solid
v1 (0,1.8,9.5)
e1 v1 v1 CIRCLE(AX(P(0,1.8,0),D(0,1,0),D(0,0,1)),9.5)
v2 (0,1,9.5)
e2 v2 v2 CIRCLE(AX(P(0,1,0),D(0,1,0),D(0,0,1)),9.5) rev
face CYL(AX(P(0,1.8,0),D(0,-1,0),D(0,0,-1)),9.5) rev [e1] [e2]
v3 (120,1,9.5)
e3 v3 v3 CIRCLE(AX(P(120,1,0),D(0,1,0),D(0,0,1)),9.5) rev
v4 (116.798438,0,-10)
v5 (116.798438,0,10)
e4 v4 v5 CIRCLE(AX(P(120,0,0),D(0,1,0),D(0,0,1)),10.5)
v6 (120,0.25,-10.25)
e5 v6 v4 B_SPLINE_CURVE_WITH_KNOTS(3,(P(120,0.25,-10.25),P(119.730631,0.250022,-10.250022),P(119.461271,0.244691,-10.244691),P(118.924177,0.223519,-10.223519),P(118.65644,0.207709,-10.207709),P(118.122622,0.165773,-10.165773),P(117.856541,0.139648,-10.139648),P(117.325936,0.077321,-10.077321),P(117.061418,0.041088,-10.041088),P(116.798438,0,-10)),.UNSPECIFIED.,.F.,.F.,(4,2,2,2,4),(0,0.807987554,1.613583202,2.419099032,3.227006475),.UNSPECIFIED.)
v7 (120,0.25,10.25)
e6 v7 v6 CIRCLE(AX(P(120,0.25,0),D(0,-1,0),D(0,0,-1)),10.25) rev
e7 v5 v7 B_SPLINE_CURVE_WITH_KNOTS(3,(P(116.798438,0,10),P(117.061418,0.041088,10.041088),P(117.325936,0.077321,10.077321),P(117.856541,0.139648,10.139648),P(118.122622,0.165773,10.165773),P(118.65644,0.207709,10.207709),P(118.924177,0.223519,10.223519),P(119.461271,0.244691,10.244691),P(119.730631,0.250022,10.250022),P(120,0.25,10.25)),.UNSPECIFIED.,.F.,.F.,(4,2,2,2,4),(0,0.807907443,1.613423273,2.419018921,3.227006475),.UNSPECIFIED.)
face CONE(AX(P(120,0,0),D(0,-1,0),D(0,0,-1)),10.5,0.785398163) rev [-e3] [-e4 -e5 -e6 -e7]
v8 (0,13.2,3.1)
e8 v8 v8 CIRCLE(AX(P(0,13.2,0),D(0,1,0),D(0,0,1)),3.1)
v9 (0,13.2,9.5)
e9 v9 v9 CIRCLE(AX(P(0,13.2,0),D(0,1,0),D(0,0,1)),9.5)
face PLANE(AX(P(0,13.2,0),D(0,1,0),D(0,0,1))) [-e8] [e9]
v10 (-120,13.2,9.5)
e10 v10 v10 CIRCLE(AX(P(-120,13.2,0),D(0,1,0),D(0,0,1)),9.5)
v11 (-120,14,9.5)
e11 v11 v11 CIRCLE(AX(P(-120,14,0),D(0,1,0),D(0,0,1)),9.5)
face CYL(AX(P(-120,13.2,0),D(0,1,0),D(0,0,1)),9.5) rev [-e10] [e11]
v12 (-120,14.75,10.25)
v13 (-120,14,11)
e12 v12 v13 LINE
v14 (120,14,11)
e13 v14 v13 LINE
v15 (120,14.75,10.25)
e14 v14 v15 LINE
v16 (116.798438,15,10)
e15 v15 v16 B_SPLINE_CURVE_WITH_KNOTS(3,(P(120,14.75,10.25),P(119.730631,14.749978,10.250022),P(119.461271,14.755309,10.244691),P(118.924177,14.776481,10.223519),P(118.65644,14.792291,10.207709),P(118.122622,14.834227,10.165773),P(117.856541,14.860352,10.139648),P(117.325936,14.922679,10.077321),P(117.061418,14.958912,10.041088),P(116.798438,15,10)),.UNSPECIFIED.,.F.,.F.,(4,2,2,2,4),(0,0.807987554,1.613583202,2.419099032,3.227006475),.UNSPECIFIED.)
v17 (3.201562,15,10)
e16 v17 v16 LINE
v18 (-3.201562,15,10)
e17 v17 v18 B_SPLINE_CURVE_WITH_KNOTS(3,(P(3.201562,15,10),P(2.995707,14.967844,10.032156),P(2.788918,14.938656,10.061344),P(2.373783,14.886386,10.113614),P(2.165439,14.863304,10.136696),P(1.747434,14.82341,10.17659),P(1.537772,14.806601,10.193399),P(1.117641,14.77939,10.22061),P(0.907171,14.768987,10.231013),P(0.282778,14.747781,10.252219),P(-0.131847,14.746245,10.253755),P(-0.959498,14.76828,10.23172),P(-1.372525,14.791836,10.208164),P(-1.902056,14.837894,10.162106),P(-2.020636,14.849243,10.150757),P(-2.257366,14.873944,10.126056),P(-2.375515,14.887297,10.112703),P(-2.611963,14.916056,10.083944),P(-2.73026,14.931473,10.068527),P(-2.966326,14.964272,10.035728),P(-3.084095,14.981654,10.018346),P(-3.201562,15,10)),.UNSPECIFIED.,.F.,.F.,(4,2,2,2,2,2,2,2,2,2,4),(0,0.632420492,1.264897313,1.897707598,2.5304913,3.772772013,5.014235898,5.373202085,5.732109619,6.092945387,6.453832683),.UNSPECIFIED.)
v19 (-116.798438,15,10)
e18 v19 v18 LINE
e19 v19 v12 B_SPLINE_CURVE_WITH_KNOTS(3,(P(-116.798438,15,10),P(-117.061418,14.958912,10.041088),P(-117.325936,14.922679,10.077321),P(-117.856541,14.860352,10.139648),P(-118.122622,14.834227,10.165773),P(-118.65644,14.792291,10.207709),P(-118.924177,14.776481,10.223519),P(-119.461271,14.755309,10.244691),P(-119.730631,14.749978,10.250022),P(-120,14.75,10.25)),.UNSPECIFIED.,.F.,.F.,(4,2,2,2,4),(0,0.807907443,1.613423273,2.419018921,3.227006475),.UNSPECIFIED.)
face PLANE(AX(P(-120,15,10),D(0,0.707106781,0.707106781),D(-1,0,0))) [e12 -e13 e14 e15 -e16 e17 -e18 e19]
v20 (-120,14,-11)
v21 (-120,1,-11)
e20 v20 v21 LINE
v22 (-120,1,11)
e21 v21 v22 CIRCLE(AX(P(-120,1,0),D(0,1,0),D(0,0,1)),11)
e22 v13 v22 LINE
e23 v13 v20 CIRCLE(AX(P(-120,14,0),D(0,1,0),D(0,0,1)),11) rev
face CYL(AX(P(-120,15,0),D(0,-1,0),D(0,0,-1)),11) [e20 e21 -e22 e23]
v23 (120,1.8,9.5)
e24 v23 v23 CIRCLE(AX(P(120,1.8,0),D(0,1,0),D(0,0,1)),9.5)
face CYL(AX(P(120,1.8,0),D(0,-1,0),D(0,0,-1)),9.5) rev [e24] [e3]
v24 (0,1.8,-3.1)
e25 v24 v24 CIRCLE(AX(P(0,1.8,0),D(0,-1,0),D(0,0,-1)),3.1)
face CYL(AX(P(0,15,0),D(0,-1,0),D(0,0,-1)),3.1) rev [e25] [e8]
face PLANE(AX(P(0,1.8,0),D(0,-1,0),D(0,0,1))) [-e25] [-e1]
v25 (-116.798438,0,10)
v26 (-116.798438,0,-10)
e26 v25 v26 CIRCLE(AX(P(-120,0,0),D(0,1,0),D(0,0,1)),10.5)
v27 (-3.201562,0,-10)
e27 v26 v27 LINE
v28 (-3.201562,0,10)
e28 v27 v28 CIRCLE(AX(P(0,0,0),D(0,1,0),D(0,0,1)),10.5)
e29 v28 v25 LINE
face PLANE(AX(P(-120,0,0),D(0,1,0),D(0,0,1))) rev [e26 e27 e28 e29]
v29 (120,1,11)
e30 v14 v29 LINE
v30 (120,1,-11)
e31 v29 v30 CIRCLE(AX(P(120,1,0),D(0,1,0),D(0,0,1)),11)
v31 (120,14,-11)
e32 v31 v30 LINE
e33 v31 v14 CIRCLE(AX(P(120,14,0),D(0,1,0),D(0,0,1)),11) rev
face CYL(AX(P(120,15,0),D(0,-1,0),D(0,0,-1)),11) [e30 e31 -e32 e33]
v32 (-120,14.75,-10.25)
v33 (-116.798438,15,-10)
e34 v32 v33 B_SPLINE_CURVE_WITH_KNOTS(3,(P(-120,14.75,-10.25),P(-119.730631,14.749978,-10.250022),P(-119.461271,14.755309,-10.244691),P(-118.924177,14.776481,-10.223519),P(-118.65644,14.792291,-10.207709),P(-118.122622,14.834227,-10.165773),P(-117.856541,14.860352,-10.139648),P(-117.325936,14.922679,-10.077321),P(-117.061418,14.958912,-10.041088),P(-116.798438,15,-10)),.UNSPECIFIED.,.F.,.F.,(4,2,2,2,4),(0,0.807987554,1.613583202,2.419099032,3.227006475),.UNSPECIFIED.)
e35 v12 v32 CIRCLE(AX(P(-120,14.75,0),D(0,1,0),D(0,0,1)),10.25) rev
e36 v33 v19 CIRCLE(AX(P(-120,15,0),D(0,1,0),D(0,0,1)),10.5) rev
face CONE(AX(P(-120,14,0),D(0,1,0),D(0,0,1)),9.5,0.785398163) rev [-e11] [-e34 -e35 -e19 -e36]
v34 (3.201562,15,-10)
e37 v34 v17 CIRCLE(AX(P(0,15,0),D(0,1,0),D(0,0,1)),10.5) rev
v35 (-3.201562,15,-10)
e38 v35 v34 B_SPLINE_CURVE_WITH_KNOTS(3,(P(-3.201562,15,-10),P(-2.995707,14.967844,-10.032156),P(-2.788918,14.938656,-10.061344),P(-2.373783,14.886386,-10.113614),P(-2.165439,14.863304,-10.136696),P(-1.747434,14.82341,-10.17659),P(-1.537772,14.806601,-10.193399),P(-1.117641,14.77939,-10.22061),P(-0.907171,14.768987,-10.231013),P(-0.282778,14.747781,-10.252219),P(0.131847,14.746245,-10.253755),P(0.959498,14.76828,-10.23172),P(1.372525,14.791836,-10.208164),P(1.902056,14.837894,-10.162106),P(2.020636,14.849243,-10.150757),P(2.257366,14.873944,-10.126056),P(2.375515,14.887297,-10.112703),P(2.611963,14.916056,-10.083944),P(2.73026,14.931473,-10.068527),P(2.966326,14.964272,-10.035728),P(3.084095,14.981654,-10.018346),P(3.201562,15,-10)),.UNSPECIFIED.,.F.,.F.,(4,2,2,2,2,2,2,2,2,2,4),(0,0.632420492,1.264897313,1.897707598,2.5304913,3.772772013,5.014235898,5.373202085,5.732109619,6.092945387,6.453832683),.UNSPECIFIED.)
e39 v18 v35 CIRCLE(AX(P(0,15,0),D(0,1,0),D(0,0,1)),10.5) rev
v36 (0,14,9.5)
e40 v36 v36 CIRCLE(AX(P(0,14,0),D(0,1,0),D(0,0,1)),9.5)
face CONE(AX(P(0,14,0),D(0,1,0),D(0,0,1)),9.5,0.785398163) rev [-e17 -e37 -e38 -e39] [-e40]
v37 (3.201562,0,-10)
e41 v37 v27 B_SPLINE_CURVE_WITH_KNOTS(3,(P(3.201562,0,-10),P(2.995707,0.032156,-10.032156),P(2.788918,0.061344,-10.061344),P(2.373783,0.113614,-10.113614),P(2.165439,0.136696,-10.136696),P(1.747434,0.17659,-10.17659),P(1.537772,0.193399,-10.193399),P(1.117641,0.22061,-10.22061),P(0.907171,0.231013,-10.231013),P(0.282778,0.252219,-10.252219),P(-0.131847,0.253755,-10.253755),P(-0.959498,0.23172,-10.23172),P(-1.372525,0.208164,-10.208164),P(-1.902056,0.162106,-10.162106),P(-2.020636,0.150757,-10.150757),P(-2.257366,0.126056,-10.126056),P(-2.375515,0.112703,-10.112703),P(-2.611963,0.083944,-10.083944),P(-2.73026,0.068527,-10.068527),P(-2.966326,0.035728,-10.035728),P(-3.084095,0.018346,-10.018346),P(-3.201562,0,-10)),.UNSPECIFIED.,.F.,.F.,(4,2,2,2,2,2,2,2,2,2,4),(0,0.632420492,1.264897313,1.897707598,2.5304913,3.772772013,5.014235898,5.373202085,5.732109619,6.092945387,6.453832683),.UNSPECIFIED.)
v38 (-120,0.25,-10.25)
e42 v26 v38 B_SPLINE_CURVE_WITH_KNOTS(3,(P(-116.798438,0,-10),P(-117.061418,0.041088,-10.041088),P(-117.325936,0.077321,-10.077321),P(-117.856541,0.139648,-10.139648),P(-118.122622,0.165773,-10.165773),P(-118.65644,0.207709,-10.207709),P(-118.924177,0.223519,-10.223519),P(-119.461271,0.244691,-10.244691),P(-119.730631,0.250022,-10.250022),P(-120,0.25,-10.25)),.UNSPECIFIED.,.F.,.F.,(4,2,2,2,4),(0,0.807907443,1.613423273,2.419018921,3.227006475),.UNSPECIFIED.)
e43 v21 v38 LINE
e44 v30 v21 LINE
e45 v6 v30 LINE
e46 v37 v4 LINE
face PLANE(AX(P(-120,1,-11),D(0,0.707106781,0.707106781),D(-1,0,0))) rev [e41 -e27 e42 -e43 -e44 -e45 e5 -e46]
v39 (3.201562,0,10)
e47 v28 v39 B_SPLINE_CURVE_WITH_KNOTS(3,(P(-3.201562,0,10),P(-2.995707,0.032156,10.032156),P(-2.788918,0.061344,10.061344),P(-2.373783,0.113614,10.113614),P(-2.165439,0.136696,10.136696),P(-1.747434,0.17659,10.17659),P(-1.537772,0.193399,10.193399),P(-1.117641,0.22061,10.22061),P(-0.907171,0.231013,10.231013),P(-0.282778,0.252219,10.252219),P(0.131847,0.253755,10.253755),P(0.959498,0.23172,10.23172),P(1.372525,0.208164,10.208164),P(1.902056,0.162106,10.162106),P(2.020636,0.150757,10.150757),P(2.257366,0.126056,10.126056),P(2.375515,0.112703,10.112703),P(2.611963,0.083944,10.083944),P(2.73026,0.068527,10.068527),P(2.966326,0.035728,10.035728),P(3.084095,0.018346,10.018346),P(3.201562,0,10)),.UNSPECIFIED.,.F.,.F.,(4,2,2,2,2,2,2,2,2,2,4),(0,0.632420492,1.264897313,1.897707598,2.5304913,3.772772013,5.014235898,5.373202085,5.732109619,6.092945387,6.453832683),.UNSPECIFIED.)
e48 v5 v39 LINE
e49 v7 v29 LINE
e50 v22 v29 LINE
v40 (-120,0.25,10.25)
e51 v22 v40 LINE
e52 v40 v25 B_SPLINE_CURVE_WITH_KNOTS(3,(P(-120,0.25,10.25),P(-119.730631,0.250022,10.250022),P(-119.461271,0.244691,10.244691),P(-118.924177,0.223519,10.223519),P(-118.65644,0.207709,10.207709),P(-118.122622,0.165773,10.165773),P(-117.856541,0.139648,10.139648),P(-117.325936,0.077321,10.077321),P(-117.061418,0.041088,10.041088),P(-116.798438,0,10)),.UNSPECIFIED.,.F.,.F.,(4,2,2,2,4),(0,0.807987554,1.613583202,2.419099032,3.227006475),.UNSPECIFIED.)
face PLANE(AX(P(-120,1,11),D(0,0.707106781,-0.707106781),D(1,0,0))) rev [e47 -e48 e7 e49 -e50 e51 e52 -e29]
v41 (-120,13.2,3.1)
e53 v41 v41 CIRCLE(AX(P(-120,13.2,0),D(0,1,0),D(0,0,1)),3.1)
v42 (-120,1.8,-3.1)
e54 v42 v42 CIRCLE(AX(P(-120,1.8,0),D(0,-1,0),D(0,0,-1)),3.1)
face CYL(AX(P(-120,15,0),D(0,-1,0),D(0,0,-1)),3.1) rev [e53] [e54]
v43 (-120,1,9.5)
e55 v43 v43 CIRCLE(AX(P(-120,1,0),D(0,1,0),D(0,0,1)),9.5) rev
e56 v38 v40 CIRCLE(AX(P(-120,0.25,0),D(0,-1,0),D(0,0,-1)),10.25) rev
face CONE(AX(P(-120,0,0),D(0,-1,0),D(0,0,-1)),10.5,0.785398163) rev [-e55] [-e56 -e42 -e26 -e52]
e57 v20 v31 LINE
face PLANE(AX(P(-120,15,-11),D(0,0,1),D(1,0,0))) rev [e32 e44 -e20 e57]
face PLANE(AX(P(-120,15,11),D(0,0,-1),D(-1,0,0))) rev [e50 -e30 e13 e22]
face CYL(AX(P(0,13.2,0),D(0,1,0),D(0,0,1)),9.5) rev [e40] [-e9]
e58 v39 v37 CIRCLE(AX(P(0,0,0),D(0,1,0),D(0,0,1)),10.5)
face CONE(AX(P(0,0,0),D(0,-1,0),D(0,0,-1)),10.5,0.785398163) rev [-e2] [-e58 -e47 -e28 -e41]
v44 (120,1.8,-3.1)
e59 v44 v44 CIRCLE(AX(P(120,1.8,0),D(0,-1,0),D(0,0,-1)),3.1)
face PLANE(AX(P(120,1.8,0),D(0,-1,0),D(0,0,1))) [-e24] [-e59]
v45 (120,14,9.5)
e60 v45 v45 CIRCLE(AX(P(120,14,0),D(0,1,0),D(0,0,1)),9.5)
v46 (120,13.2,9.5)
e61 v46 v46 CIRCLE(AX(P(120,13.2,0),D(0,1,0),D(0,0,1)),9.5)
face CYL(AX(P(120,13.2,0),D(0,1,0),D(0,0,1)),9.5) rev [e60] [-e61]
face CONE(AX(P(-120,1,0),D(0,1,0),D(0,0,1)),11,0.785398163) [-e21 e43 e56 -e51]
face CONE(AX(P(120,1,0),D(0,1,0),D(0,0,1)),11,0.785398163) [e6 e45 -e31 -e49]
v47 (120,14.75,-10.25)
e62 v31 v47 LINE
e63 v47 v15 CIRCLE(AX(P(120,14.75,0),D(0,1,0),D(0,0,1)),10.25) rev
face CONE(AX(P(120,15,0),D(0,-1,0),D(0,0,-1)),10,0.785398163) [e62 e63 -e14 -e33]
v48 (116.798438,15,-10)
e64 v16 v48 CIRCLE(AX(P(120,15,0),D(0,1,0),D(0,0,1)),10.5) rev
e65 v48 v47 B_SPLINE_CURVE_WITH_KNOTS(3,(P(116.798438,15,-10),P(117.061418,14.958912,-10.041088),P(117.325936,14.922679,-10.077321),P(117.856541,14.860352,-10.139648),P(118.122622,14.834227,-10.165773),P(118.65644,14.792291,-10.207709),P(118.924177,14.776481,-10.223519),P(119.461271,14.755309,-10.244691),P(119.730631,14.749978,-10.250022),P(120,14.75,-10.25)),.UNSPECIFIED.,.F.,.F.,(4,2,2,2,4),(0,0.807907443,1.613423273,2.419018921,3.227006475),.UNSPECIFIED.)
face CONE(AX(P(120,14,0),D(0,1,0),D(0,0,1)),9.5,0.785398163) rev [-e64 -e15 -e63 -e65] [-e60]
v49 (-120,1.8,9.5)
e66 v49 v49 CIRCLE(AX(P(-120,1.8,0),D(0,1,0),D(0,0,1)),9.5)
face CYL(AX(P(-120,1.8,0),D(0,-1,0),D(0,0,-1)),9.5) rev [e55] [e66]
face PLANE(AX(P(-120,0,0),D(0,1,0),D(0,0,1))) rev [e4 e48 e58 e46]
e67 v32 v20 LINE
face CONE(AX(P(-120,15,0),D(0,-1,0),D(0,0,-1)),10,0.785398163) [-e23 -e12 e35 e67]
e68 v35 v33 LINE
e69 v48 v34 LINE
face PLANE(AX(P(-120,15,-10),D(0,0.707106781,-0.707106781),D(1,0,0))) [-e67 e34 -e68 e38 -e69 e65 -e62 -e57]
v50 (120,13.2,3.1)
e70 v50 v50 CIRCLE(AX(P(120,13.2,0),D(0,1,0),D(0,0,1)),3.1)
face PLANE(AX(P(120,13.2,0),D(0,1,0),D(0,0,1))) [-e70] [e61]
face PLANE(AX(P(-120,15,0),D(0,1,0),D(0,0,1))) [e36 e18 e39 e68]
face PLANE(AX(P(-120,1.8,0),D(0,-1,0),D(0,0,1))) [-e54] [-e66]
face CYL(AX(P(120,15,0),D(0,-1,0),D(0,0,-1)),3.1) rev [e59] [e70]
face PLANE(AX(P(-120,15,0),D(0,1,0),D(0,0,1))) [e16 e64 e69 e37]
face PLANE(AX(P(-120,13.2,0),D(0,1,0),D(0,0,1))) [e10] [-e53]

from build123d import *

# Parameters (mm, degrees)
SKETCH1_R           = 3.1
BOSS_EXTRUDE1_DEPTH = 15
SKETCH2_R           = 9.5
CUT_EXTRUDE1_DEPTH  = 1.8
CHAMFER2_SIZE       = 1


with BuildPart() as part:
    # Sketch1 → Boss-Extrude1 (new body)
    with BuildSketch(Plane(origin=(0, 0, 0), x_dir=(1, 0, 0), z_dir=(0, 1, 0))):
        with BuildLine():
            Line((-120, 11), (120, 11))
            ThreePointArc((120, 11), (131, 0), (120, -11))
            Line((120, -11), (-120, -11))
            ThreePointArc((-120, -11), (-131, 0), (-120, 11))
        make_face()
        with Locations(Location((-120, 0, 0), (0, 0, 270))):
            Circle(SKETCH1_R, mode=Mode.SUBTRACT)
        with Locations(Location((120, 0, 0), (0, 0, 270))):
            Circle(SKETCH1_R, mode=Mode.SUBTRACT)
        with Locations(Location((0, 0, 0), (0, 0, 270))):
            Circle(SKETCH1_R, mode=Mode.SUBTRACT)
    extrude(amount=BOSS_EXTRUDE1_DEPTH)

    # Sketch2 → Cut-Extrude1 (cut)
    with BuildSketch(Plane(origin=(0, 15, 0), x_dir=(1, 0, 0), z_dir=(0, 1, 0))):
        with Locations(Location((120, 0, 0), (0, 0, 270))):
            Circle(SKETCH2_R)
        with Locations(Location((0, 0, 0), (0, 0, 270))):
            Circle(SKETCH2_R)
        with Locations(Location((-120, 0, 0), (0, 0, 270))):
            Circle(SKETCH2_R)
    cut_extrude1 = extrude(amount=-CUT_EXTRUDE1_DEPTH, mode=Mode.SUBTRACT)

    # Chamfer2
    chamfer2_edges = [part.edges().sort_by_distance(p)[0] for p in [
        (131, 15, 0),
        (0, 15, -11),
        (-131, 15, 0),
        (0, 0, -11),
        (131, 0, 0),
        (0, 0, 11),
        (-131, 0, 0),
        (0, 15, 11),
    ]]
    chamfer(chamfer2_edges, length=CHAMFER2_SIZE)

    # Mirror1: Cut-Extrude1 across plane
    add(cut_extrude1.mirror(Plane.ZX.offset(7.5)), mode=Mode.SUBTRACT)

    # Chamfer1: read off the stored shape, not the designer's step
    # Chamfer1: loft between two sections, ruled curve by curve
    chamfer1_from = [
        Edge.make_three_point_arc((120, 1, 9.5), (110.5, 1, 0), (120, 1, -9.5)),
        Edge.make_three_point_arc((120, 1, -9.5), (129.5, 1, 0), (120, 1, 9.5)),
    ]
    chamfer1_to = [
        Edge.make_three_point_arc((120, 0, 10.5), (109.5, 0, 0), (120, 0, -10.5)),
        Edge.make_three_point_arc((120, 0, -10.5), (130.5, 0, 0), (120, 0, 10.5)),
    ]
    chamfer1 = Solid(Shell([*[Face.make_surface_from_curves(chamfer1_from[k], chamfer1_to[k]) for k in range(2)], Face(Wire(chamfer1_from)), Face(Wire(chamfer1_to))]))
    add(chamfer1, mode=Mode.SUBTRACT)

    # Chamfer1 2: loft between two sections, ruled curve by curve
    chamfer1_2_from = [
        Edge.make_three_point_arc((2.896651441, 1, -9.047619048), (9.047619048, 1, 2.896651441), (-2.896651441, 1, 9.047619048)),
        Edge.make_three_point_arc((-2.896651441, 1, 9.047619048), (-9.047619048, 1, -2.896651441), (2.896651441, 1, -9.047619048)),
    ]
    chamfer1_2_to = [
        Edge.make_three_point_arc((3.201562119, 0, -10), (10, 0, 3.201562119), (-3.201562119, 0, 10)),
        Edge.make_three_point_arc((-3.201562119, 0, 10), (-10, 0, -3.201562119), (3.201562119, 0, -10)),
    ]
    chamfer1_2 = Solid(Shell([*[Face.make_surface_from_curves(chamfer1_2_from[k], chamfer1_2_to[k]) for k in range(2)], Face(Wire(chamfer1_2_from)), Face(Wire(chamfer1_2_to))]))
    add(chamfer1_2, mode=Mode.SUBTRACT)

    # Chamfer1 3: loft between two sections, ruled curve by curve
    chamfer1_3_from = [
        Edge.make_three_point_arc((-120, 1, 9.5), (-129.5, 1, 0), (-120, 1, -9.5)),
        Edge.make_three_point_arc((-120, 1, -9.5), (-110.5, 1, 0), (-120, 1, 9.5)),
    ]
    chamfer1_3_to = [
        Edge.make_three_point_arc((-120, 0, 10.5), (-130.5, 0, 0), (-120, 0, -10.5)),
        Edge.make_three_point_arc((-120, 0, -10.5), (-109.5, 0, 0), (-120, 0, 10.5)),
    ]
    chamfer1_3 = Solid(Shell([*[Face.make_surface_from_curves(chamfer1_3_from[k], chamfer1_3_to[k]) for k in range(2)], Face(Wire(chamfer1_3_from)), Face(Wire(chamfer1_3_to))]))
    add(chamfer1_3, mode=Mode.SUBTRACT)

    # Chamfer1 4: loft between two sections, ruled curve by curve
    chamfer1_4_from = [
        Edge.make_three_point_arc((120, 14, 9.5), (129.5, 14, 0), (120, 14, -9.5)),
        Edge.make_three_point_arc((120, 14, -9.5), (110.5, 14, 0), (120, 14, 9.5)),
    ]
    chamfer1_4_to = [
        Edge.make_three_point_arc((120, 15, 10.5), (130.5, 15, 0), (120, 15, -10.5)),
        Edge.make_three_point_arc((120, 15, -10.5), (109.5, 15, 0), (120, 15, 10.5)),
    ]
    chamfer1_4 = Solid(Shell([*[Face.make_surface_from_curves(chamfer1_4_from[k], chamfer1_4_to[k]) for k in range(2)], Face(Wire(chamfer1_4_from)), Face(Wire(chamfer1_4_to))]))
    add(chamfer1_4, mode=Mode.SUBTRACT)

    # Chamfer1 5: loft between two sections, ruled curve by curve
    chamfer1_5_from = [
        Edge.make_three_point_arc((0, 14, 9.5), (9.5, 14, 0), (0, 14, -9.5)),
        Edge.make_three_point_arc((0, 14, -9.5), (-9.5, 14, 0), (0, 14, 9.5)),
    ]
    chamfer1_5_to = [
        Edge.make_three_point_arc((0, 15, 10.5), (10.5, 15, 0), (0, 15, -10.5)),
        Edge.make_three_point_arc((0, 15, -10.5), (-10.5, 15, 0), (0, 15, 10.5)),
    ]
    chamfer1_5 = Solid(Shell([*[Face.make_surface_from_curves(chamfer1_5_from[k], chamfer1_5_to[k]) for k in range(2)], Face(Wire(chamfer1_5_from)), Face(Wire(chamfer1_5_to))]))
    add(chamfer1_5, mode=Mode.SUBTRACT)

    # Chamfer1 6: loft between two sections, ruled curve by curve
    chamfer1_6_from = [
        Edge.make_three_point_arc((-120, 14, 9.5), (-110.5, 14, 0), (-120, 14, -9.5)),
        Edge.make_three_point_arc((-120, 14, -9.5), (-129.5, 14, 0), (-120, 14, 9.5)),
    ]
    chamfer1_6_to = [
        Edge.make_three_point_arc((-120, 15, 10.5), (-109.5, 15, 0), (-120, 15, -10.5)),
        Edge.make_three_point_arc((-120, 15, -10.5), (-130.5, 15, 0), (-120, 15, 10.5)),
    ]
    chamfer1_6 = Solid(Shell([*[Face.make_surface_from_curves(chamfer1_6_from[k], chamfer1_6_to[k]) for k in range(2)], Face(Wire(chamfer1_6_from)), Face(Wire(chamfer1_6_to))]))
    add(chamfer1_6, mode=Mode.SUBTRACT)


solid = part.part
